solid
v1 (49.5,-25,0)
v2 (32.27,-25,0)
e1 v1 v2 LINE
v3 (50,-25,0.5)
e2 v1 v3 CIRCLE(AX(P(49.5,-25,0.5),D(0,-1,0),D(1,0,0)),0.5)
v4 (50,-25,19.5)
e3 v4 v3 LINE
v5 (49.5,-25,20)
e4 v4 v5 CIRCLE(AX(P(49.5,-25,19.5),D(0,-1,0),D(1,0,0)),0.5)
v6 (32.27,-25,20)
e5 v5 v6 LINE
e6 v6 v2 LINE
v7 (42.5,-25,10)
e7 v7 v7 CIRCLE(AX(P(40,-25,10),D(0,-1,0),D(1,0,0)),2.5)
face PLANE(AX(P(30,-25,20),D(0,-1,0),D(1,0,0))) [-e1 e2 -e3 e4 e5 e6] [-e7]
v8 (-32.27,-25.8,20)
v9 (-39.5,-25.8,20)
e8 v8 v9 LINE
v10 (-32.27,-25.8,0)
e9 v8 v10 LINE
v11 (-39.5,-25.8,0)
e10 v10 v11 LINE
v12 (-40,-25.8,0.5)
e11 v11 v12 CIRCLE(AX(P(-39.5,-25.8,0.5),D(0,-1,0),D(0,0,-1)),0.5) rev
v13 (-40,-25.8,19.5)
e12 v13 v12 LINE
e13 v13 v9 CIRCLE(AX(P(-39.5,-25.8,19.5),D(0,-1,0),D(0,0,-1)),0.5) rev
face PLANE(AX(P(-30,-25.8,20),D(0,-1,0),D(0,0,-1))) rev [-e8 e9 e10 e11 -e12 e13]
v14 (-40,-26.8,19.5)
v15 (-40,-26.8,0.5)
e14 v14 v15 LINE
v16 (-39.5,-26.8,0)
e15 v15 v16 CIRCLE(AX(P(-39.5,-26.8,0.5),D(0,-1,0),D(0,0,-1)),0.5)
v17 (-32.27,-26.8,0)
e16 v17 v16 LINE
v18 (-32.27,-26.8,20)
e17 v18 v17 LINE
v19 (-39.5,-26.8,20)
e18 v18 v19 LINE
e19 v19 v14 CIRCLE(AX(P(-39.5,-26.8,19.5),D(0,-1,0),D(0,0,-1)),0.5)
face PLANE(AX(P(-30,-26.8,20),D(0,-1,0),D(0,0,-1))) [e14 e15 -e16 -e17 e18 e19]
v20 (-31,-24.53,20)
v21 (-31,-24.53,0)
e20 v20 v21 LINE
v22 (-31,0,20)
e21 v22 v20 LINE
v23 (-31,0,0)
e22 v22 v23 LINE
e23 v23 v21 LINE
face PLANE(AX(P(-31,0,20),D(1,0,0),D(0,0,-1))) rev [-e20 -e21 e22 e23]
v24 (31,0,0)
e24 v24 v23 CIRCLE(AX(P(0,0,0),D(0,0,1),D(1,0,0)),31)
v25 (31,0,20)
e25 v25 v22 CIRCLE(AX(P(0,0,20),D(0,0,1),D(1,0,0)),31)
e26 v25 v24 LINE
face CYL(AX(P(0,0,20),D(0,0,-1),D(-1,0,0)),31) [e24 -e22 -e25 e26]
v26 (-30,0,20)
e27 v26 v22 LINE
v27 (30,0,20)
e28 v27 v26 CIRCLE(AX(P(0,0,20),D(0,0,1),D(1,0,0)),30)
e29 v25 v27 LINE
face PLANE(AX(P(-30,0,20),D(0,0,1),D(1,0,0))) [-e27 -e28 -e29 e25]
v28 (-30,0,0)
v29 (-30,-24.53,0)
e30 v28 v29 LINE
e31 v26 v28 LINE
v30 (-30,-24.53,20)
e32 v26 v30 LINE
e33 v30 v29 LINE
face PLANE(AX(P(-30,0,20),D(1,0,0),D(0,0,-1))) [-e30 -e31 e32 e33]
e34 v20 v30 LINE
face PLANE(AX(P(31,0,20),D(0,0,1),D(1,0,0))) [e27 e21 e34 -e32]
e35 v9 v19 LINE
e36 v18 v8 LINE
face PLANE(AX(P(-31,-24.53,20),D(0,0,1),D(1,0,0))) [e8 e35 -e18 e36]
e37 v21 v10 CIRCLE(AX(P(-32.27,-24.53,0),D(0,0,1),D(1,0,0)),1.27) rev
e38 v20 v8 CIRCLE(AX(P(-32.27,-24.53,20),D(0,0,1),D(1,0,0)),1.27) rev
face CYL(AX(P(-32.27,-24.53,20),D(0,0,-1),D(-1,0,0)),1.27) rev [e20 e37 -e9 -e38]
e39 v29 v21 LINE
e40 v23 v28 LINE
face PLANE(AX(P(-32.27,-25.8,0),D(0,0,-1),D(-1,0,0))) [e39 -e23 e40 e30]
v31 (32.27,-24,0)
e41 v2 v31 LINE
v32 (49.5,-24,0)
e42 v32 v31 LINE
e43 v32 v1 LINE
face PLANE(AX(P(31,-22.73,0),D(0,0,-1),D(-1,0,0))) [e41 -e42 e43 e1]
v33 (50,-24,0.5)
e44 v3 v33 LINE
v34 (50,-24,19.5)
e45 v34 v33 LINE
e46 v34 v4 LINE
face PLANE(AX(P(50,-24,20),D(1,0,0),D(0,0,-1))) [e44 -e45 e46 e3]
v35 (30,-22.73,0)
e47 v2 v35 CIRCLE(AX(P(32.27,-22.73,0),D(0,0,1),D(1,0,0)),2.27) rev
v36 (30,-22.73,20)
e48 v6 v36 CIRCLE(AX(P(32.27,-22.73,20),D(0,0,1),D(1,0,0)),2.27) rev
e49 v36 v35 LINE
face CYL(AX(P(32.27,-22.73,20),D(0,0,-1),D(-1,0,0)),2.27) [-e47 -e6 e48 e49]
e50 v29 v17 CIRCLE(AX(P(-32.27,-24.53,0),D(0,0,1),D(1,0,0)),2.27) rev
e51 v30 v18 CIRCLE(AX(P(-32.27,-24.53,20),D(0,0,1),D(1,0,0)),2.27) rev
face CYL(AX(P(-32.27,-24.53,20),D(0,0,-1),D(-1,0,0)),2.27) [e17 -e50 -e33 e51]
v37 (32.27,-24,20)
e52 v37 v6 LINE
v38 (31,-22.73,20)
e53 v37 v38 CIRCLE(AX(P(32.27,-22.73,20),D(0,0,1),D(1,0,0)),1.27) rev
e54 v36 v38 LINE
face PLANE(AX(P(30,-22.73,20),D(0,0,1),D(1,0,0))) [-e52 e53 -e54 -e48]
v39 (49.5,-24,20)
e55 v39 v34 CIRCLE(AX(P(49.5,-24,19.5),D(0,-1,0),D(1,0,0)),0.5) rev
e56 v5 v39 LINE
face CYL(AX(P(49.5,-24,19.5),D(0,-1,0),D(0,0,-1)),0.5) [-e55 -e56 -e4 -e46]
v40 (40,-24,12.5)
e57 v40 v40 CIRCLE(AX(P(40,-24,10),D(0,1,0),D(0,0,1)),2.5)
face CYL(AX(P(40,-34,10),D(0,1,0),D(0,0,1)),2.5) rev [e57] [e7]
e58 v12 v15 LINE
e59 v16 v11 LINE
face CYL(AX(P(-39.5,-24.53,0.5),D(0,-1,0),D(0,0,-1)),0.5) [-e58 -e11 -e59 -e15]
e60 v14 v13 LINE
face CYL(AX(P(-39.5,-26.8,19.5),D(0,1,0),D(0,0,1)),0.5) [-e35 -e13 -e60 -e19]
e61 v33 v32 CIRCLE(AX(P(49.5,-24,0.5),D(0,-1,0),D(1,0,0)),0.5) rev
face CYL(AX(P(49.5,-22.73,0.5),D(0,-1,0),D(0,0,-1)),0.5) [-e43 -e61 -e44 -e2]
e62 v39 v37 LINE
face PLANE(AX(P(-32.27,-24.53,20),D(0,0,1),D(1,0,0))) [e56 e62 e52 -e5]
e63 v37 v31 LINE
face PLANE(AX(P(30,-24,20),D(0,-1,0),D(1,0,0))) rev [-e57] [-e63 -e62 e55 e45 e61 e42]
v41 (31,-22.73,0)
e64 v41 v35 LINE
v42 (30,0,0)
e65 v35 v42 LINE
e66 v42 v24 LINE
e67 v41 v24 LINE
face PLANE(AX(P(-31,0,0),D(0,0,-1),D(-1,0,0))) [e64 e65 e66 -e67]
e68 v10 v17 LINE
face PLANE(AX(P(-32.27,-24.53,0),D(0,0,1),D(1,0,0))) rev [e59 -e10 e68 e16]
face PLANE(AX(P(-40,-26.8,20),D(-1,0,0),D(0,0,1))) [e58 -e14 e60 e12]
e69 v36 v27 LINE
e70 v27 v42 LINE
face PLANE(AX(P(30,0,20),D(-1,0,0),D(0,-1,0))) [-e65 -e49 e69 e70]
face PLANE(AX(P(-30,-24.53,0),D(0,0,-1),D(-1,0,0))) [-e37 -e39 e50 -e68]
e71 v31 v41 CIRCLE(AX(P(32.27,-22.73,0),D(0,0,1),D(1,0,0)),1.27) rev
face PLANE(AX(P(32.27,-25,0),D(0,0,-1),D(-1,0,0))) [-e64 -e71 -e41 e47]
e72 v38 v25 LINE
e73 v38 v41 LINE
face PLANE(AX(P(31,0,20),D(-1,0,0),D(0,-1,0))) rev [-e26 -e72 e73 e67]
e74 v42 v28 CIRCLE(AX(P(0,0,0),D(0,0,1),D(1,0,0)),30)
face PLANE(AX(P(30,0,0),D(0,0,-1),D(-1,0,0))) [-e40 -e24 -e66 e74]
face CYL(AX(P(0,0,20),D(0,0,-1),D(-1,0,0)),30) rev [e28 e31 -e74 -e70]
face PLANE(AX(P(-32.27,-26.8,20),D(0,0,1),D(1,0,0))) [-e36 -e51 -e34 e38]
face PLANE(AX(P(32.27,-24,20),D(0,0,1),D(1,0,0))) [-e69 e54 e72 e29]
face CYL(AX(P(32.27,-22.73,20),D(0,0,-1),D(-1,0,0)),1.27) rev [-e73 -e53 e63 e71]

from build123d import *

# Parameters (mm, degrees)
BASE_FLANGE1_DEPTH = 20
SKETCH6_R          = 2.5
CUT_EXTRUDE1_DEPTH = 10
FILLET1_R          = 0.5


# Sheet-metal steps are written as plain solids
with BuildPart() as part:
    # Sketch1 → Base-Flange1 (new body)
    with BuildSketch(Plane.XY):
        with BuildLine():
            Line((50, -25), (32.27, -25))
            ThreePointArc((32.27, -25), (30.664867607, -24.335132393), (30, -22.73))
            Line((30, -22.73), (30, 0))
            ThreePointArc((30, 0), (0, 30), (-30, 0))
            Line((-30, 0), (-30, -24.53))
            ThreePointArc((-30, -24.53), (-30.664867607, -26.135132393), (-32.27, -26.8))
            Line((-32.27, -26.8), (-40, -26.8))
            Line((-40, -26.8), (-40, -25.8))
            Line((-40, -25.8), (-32.27, -25.8))
            ThreePointArc((-32.27, -25.8), (-31.371974388, -25.428025612), (-31, -24.53))
            Line((-31, -24.53), (-31, 0))
            ThreePointArc((-31, 0), (0, 31), (31, 0))
            Line((31, 0), (31, -22.73))
            ThreePointArc((31, -22.73), (31.371974388, -23.628025612), (32.27, -24))
            Line((32.27, -24), (50, -24))
            Line((50, -24), (50, -25))
        make_face()
    extrude(amount=BASE_FLANGE1_DEPTH)

    # Sketch6 → Cut-Extrude1 (cut)
    with BuildSketch(Plane(origin=(0, -24, 0), x_dir=(1, 0, 0), z_dir=(0, 1, 0))):
        with Locations(Location((40, -10, 0), (0, 0, 270))):
            Circle(SKETCH6_R)
    extrude(amount=-CUT_EXTRUDE1_DEPTH, mode=Mode.SUBTRACT)

    # Fillet1
    fillet1_edges = [part.edges().sort_by_distance(p)[0] for p in [
        (50, -24.5, 0),
        (-40, -26.3, 0),
        (50, -24.5, 20),
        (-40, -26.3, 20),
    ]]
    fillet(fillet1_edges, radius=FILLET1_R)


solid = part.part
